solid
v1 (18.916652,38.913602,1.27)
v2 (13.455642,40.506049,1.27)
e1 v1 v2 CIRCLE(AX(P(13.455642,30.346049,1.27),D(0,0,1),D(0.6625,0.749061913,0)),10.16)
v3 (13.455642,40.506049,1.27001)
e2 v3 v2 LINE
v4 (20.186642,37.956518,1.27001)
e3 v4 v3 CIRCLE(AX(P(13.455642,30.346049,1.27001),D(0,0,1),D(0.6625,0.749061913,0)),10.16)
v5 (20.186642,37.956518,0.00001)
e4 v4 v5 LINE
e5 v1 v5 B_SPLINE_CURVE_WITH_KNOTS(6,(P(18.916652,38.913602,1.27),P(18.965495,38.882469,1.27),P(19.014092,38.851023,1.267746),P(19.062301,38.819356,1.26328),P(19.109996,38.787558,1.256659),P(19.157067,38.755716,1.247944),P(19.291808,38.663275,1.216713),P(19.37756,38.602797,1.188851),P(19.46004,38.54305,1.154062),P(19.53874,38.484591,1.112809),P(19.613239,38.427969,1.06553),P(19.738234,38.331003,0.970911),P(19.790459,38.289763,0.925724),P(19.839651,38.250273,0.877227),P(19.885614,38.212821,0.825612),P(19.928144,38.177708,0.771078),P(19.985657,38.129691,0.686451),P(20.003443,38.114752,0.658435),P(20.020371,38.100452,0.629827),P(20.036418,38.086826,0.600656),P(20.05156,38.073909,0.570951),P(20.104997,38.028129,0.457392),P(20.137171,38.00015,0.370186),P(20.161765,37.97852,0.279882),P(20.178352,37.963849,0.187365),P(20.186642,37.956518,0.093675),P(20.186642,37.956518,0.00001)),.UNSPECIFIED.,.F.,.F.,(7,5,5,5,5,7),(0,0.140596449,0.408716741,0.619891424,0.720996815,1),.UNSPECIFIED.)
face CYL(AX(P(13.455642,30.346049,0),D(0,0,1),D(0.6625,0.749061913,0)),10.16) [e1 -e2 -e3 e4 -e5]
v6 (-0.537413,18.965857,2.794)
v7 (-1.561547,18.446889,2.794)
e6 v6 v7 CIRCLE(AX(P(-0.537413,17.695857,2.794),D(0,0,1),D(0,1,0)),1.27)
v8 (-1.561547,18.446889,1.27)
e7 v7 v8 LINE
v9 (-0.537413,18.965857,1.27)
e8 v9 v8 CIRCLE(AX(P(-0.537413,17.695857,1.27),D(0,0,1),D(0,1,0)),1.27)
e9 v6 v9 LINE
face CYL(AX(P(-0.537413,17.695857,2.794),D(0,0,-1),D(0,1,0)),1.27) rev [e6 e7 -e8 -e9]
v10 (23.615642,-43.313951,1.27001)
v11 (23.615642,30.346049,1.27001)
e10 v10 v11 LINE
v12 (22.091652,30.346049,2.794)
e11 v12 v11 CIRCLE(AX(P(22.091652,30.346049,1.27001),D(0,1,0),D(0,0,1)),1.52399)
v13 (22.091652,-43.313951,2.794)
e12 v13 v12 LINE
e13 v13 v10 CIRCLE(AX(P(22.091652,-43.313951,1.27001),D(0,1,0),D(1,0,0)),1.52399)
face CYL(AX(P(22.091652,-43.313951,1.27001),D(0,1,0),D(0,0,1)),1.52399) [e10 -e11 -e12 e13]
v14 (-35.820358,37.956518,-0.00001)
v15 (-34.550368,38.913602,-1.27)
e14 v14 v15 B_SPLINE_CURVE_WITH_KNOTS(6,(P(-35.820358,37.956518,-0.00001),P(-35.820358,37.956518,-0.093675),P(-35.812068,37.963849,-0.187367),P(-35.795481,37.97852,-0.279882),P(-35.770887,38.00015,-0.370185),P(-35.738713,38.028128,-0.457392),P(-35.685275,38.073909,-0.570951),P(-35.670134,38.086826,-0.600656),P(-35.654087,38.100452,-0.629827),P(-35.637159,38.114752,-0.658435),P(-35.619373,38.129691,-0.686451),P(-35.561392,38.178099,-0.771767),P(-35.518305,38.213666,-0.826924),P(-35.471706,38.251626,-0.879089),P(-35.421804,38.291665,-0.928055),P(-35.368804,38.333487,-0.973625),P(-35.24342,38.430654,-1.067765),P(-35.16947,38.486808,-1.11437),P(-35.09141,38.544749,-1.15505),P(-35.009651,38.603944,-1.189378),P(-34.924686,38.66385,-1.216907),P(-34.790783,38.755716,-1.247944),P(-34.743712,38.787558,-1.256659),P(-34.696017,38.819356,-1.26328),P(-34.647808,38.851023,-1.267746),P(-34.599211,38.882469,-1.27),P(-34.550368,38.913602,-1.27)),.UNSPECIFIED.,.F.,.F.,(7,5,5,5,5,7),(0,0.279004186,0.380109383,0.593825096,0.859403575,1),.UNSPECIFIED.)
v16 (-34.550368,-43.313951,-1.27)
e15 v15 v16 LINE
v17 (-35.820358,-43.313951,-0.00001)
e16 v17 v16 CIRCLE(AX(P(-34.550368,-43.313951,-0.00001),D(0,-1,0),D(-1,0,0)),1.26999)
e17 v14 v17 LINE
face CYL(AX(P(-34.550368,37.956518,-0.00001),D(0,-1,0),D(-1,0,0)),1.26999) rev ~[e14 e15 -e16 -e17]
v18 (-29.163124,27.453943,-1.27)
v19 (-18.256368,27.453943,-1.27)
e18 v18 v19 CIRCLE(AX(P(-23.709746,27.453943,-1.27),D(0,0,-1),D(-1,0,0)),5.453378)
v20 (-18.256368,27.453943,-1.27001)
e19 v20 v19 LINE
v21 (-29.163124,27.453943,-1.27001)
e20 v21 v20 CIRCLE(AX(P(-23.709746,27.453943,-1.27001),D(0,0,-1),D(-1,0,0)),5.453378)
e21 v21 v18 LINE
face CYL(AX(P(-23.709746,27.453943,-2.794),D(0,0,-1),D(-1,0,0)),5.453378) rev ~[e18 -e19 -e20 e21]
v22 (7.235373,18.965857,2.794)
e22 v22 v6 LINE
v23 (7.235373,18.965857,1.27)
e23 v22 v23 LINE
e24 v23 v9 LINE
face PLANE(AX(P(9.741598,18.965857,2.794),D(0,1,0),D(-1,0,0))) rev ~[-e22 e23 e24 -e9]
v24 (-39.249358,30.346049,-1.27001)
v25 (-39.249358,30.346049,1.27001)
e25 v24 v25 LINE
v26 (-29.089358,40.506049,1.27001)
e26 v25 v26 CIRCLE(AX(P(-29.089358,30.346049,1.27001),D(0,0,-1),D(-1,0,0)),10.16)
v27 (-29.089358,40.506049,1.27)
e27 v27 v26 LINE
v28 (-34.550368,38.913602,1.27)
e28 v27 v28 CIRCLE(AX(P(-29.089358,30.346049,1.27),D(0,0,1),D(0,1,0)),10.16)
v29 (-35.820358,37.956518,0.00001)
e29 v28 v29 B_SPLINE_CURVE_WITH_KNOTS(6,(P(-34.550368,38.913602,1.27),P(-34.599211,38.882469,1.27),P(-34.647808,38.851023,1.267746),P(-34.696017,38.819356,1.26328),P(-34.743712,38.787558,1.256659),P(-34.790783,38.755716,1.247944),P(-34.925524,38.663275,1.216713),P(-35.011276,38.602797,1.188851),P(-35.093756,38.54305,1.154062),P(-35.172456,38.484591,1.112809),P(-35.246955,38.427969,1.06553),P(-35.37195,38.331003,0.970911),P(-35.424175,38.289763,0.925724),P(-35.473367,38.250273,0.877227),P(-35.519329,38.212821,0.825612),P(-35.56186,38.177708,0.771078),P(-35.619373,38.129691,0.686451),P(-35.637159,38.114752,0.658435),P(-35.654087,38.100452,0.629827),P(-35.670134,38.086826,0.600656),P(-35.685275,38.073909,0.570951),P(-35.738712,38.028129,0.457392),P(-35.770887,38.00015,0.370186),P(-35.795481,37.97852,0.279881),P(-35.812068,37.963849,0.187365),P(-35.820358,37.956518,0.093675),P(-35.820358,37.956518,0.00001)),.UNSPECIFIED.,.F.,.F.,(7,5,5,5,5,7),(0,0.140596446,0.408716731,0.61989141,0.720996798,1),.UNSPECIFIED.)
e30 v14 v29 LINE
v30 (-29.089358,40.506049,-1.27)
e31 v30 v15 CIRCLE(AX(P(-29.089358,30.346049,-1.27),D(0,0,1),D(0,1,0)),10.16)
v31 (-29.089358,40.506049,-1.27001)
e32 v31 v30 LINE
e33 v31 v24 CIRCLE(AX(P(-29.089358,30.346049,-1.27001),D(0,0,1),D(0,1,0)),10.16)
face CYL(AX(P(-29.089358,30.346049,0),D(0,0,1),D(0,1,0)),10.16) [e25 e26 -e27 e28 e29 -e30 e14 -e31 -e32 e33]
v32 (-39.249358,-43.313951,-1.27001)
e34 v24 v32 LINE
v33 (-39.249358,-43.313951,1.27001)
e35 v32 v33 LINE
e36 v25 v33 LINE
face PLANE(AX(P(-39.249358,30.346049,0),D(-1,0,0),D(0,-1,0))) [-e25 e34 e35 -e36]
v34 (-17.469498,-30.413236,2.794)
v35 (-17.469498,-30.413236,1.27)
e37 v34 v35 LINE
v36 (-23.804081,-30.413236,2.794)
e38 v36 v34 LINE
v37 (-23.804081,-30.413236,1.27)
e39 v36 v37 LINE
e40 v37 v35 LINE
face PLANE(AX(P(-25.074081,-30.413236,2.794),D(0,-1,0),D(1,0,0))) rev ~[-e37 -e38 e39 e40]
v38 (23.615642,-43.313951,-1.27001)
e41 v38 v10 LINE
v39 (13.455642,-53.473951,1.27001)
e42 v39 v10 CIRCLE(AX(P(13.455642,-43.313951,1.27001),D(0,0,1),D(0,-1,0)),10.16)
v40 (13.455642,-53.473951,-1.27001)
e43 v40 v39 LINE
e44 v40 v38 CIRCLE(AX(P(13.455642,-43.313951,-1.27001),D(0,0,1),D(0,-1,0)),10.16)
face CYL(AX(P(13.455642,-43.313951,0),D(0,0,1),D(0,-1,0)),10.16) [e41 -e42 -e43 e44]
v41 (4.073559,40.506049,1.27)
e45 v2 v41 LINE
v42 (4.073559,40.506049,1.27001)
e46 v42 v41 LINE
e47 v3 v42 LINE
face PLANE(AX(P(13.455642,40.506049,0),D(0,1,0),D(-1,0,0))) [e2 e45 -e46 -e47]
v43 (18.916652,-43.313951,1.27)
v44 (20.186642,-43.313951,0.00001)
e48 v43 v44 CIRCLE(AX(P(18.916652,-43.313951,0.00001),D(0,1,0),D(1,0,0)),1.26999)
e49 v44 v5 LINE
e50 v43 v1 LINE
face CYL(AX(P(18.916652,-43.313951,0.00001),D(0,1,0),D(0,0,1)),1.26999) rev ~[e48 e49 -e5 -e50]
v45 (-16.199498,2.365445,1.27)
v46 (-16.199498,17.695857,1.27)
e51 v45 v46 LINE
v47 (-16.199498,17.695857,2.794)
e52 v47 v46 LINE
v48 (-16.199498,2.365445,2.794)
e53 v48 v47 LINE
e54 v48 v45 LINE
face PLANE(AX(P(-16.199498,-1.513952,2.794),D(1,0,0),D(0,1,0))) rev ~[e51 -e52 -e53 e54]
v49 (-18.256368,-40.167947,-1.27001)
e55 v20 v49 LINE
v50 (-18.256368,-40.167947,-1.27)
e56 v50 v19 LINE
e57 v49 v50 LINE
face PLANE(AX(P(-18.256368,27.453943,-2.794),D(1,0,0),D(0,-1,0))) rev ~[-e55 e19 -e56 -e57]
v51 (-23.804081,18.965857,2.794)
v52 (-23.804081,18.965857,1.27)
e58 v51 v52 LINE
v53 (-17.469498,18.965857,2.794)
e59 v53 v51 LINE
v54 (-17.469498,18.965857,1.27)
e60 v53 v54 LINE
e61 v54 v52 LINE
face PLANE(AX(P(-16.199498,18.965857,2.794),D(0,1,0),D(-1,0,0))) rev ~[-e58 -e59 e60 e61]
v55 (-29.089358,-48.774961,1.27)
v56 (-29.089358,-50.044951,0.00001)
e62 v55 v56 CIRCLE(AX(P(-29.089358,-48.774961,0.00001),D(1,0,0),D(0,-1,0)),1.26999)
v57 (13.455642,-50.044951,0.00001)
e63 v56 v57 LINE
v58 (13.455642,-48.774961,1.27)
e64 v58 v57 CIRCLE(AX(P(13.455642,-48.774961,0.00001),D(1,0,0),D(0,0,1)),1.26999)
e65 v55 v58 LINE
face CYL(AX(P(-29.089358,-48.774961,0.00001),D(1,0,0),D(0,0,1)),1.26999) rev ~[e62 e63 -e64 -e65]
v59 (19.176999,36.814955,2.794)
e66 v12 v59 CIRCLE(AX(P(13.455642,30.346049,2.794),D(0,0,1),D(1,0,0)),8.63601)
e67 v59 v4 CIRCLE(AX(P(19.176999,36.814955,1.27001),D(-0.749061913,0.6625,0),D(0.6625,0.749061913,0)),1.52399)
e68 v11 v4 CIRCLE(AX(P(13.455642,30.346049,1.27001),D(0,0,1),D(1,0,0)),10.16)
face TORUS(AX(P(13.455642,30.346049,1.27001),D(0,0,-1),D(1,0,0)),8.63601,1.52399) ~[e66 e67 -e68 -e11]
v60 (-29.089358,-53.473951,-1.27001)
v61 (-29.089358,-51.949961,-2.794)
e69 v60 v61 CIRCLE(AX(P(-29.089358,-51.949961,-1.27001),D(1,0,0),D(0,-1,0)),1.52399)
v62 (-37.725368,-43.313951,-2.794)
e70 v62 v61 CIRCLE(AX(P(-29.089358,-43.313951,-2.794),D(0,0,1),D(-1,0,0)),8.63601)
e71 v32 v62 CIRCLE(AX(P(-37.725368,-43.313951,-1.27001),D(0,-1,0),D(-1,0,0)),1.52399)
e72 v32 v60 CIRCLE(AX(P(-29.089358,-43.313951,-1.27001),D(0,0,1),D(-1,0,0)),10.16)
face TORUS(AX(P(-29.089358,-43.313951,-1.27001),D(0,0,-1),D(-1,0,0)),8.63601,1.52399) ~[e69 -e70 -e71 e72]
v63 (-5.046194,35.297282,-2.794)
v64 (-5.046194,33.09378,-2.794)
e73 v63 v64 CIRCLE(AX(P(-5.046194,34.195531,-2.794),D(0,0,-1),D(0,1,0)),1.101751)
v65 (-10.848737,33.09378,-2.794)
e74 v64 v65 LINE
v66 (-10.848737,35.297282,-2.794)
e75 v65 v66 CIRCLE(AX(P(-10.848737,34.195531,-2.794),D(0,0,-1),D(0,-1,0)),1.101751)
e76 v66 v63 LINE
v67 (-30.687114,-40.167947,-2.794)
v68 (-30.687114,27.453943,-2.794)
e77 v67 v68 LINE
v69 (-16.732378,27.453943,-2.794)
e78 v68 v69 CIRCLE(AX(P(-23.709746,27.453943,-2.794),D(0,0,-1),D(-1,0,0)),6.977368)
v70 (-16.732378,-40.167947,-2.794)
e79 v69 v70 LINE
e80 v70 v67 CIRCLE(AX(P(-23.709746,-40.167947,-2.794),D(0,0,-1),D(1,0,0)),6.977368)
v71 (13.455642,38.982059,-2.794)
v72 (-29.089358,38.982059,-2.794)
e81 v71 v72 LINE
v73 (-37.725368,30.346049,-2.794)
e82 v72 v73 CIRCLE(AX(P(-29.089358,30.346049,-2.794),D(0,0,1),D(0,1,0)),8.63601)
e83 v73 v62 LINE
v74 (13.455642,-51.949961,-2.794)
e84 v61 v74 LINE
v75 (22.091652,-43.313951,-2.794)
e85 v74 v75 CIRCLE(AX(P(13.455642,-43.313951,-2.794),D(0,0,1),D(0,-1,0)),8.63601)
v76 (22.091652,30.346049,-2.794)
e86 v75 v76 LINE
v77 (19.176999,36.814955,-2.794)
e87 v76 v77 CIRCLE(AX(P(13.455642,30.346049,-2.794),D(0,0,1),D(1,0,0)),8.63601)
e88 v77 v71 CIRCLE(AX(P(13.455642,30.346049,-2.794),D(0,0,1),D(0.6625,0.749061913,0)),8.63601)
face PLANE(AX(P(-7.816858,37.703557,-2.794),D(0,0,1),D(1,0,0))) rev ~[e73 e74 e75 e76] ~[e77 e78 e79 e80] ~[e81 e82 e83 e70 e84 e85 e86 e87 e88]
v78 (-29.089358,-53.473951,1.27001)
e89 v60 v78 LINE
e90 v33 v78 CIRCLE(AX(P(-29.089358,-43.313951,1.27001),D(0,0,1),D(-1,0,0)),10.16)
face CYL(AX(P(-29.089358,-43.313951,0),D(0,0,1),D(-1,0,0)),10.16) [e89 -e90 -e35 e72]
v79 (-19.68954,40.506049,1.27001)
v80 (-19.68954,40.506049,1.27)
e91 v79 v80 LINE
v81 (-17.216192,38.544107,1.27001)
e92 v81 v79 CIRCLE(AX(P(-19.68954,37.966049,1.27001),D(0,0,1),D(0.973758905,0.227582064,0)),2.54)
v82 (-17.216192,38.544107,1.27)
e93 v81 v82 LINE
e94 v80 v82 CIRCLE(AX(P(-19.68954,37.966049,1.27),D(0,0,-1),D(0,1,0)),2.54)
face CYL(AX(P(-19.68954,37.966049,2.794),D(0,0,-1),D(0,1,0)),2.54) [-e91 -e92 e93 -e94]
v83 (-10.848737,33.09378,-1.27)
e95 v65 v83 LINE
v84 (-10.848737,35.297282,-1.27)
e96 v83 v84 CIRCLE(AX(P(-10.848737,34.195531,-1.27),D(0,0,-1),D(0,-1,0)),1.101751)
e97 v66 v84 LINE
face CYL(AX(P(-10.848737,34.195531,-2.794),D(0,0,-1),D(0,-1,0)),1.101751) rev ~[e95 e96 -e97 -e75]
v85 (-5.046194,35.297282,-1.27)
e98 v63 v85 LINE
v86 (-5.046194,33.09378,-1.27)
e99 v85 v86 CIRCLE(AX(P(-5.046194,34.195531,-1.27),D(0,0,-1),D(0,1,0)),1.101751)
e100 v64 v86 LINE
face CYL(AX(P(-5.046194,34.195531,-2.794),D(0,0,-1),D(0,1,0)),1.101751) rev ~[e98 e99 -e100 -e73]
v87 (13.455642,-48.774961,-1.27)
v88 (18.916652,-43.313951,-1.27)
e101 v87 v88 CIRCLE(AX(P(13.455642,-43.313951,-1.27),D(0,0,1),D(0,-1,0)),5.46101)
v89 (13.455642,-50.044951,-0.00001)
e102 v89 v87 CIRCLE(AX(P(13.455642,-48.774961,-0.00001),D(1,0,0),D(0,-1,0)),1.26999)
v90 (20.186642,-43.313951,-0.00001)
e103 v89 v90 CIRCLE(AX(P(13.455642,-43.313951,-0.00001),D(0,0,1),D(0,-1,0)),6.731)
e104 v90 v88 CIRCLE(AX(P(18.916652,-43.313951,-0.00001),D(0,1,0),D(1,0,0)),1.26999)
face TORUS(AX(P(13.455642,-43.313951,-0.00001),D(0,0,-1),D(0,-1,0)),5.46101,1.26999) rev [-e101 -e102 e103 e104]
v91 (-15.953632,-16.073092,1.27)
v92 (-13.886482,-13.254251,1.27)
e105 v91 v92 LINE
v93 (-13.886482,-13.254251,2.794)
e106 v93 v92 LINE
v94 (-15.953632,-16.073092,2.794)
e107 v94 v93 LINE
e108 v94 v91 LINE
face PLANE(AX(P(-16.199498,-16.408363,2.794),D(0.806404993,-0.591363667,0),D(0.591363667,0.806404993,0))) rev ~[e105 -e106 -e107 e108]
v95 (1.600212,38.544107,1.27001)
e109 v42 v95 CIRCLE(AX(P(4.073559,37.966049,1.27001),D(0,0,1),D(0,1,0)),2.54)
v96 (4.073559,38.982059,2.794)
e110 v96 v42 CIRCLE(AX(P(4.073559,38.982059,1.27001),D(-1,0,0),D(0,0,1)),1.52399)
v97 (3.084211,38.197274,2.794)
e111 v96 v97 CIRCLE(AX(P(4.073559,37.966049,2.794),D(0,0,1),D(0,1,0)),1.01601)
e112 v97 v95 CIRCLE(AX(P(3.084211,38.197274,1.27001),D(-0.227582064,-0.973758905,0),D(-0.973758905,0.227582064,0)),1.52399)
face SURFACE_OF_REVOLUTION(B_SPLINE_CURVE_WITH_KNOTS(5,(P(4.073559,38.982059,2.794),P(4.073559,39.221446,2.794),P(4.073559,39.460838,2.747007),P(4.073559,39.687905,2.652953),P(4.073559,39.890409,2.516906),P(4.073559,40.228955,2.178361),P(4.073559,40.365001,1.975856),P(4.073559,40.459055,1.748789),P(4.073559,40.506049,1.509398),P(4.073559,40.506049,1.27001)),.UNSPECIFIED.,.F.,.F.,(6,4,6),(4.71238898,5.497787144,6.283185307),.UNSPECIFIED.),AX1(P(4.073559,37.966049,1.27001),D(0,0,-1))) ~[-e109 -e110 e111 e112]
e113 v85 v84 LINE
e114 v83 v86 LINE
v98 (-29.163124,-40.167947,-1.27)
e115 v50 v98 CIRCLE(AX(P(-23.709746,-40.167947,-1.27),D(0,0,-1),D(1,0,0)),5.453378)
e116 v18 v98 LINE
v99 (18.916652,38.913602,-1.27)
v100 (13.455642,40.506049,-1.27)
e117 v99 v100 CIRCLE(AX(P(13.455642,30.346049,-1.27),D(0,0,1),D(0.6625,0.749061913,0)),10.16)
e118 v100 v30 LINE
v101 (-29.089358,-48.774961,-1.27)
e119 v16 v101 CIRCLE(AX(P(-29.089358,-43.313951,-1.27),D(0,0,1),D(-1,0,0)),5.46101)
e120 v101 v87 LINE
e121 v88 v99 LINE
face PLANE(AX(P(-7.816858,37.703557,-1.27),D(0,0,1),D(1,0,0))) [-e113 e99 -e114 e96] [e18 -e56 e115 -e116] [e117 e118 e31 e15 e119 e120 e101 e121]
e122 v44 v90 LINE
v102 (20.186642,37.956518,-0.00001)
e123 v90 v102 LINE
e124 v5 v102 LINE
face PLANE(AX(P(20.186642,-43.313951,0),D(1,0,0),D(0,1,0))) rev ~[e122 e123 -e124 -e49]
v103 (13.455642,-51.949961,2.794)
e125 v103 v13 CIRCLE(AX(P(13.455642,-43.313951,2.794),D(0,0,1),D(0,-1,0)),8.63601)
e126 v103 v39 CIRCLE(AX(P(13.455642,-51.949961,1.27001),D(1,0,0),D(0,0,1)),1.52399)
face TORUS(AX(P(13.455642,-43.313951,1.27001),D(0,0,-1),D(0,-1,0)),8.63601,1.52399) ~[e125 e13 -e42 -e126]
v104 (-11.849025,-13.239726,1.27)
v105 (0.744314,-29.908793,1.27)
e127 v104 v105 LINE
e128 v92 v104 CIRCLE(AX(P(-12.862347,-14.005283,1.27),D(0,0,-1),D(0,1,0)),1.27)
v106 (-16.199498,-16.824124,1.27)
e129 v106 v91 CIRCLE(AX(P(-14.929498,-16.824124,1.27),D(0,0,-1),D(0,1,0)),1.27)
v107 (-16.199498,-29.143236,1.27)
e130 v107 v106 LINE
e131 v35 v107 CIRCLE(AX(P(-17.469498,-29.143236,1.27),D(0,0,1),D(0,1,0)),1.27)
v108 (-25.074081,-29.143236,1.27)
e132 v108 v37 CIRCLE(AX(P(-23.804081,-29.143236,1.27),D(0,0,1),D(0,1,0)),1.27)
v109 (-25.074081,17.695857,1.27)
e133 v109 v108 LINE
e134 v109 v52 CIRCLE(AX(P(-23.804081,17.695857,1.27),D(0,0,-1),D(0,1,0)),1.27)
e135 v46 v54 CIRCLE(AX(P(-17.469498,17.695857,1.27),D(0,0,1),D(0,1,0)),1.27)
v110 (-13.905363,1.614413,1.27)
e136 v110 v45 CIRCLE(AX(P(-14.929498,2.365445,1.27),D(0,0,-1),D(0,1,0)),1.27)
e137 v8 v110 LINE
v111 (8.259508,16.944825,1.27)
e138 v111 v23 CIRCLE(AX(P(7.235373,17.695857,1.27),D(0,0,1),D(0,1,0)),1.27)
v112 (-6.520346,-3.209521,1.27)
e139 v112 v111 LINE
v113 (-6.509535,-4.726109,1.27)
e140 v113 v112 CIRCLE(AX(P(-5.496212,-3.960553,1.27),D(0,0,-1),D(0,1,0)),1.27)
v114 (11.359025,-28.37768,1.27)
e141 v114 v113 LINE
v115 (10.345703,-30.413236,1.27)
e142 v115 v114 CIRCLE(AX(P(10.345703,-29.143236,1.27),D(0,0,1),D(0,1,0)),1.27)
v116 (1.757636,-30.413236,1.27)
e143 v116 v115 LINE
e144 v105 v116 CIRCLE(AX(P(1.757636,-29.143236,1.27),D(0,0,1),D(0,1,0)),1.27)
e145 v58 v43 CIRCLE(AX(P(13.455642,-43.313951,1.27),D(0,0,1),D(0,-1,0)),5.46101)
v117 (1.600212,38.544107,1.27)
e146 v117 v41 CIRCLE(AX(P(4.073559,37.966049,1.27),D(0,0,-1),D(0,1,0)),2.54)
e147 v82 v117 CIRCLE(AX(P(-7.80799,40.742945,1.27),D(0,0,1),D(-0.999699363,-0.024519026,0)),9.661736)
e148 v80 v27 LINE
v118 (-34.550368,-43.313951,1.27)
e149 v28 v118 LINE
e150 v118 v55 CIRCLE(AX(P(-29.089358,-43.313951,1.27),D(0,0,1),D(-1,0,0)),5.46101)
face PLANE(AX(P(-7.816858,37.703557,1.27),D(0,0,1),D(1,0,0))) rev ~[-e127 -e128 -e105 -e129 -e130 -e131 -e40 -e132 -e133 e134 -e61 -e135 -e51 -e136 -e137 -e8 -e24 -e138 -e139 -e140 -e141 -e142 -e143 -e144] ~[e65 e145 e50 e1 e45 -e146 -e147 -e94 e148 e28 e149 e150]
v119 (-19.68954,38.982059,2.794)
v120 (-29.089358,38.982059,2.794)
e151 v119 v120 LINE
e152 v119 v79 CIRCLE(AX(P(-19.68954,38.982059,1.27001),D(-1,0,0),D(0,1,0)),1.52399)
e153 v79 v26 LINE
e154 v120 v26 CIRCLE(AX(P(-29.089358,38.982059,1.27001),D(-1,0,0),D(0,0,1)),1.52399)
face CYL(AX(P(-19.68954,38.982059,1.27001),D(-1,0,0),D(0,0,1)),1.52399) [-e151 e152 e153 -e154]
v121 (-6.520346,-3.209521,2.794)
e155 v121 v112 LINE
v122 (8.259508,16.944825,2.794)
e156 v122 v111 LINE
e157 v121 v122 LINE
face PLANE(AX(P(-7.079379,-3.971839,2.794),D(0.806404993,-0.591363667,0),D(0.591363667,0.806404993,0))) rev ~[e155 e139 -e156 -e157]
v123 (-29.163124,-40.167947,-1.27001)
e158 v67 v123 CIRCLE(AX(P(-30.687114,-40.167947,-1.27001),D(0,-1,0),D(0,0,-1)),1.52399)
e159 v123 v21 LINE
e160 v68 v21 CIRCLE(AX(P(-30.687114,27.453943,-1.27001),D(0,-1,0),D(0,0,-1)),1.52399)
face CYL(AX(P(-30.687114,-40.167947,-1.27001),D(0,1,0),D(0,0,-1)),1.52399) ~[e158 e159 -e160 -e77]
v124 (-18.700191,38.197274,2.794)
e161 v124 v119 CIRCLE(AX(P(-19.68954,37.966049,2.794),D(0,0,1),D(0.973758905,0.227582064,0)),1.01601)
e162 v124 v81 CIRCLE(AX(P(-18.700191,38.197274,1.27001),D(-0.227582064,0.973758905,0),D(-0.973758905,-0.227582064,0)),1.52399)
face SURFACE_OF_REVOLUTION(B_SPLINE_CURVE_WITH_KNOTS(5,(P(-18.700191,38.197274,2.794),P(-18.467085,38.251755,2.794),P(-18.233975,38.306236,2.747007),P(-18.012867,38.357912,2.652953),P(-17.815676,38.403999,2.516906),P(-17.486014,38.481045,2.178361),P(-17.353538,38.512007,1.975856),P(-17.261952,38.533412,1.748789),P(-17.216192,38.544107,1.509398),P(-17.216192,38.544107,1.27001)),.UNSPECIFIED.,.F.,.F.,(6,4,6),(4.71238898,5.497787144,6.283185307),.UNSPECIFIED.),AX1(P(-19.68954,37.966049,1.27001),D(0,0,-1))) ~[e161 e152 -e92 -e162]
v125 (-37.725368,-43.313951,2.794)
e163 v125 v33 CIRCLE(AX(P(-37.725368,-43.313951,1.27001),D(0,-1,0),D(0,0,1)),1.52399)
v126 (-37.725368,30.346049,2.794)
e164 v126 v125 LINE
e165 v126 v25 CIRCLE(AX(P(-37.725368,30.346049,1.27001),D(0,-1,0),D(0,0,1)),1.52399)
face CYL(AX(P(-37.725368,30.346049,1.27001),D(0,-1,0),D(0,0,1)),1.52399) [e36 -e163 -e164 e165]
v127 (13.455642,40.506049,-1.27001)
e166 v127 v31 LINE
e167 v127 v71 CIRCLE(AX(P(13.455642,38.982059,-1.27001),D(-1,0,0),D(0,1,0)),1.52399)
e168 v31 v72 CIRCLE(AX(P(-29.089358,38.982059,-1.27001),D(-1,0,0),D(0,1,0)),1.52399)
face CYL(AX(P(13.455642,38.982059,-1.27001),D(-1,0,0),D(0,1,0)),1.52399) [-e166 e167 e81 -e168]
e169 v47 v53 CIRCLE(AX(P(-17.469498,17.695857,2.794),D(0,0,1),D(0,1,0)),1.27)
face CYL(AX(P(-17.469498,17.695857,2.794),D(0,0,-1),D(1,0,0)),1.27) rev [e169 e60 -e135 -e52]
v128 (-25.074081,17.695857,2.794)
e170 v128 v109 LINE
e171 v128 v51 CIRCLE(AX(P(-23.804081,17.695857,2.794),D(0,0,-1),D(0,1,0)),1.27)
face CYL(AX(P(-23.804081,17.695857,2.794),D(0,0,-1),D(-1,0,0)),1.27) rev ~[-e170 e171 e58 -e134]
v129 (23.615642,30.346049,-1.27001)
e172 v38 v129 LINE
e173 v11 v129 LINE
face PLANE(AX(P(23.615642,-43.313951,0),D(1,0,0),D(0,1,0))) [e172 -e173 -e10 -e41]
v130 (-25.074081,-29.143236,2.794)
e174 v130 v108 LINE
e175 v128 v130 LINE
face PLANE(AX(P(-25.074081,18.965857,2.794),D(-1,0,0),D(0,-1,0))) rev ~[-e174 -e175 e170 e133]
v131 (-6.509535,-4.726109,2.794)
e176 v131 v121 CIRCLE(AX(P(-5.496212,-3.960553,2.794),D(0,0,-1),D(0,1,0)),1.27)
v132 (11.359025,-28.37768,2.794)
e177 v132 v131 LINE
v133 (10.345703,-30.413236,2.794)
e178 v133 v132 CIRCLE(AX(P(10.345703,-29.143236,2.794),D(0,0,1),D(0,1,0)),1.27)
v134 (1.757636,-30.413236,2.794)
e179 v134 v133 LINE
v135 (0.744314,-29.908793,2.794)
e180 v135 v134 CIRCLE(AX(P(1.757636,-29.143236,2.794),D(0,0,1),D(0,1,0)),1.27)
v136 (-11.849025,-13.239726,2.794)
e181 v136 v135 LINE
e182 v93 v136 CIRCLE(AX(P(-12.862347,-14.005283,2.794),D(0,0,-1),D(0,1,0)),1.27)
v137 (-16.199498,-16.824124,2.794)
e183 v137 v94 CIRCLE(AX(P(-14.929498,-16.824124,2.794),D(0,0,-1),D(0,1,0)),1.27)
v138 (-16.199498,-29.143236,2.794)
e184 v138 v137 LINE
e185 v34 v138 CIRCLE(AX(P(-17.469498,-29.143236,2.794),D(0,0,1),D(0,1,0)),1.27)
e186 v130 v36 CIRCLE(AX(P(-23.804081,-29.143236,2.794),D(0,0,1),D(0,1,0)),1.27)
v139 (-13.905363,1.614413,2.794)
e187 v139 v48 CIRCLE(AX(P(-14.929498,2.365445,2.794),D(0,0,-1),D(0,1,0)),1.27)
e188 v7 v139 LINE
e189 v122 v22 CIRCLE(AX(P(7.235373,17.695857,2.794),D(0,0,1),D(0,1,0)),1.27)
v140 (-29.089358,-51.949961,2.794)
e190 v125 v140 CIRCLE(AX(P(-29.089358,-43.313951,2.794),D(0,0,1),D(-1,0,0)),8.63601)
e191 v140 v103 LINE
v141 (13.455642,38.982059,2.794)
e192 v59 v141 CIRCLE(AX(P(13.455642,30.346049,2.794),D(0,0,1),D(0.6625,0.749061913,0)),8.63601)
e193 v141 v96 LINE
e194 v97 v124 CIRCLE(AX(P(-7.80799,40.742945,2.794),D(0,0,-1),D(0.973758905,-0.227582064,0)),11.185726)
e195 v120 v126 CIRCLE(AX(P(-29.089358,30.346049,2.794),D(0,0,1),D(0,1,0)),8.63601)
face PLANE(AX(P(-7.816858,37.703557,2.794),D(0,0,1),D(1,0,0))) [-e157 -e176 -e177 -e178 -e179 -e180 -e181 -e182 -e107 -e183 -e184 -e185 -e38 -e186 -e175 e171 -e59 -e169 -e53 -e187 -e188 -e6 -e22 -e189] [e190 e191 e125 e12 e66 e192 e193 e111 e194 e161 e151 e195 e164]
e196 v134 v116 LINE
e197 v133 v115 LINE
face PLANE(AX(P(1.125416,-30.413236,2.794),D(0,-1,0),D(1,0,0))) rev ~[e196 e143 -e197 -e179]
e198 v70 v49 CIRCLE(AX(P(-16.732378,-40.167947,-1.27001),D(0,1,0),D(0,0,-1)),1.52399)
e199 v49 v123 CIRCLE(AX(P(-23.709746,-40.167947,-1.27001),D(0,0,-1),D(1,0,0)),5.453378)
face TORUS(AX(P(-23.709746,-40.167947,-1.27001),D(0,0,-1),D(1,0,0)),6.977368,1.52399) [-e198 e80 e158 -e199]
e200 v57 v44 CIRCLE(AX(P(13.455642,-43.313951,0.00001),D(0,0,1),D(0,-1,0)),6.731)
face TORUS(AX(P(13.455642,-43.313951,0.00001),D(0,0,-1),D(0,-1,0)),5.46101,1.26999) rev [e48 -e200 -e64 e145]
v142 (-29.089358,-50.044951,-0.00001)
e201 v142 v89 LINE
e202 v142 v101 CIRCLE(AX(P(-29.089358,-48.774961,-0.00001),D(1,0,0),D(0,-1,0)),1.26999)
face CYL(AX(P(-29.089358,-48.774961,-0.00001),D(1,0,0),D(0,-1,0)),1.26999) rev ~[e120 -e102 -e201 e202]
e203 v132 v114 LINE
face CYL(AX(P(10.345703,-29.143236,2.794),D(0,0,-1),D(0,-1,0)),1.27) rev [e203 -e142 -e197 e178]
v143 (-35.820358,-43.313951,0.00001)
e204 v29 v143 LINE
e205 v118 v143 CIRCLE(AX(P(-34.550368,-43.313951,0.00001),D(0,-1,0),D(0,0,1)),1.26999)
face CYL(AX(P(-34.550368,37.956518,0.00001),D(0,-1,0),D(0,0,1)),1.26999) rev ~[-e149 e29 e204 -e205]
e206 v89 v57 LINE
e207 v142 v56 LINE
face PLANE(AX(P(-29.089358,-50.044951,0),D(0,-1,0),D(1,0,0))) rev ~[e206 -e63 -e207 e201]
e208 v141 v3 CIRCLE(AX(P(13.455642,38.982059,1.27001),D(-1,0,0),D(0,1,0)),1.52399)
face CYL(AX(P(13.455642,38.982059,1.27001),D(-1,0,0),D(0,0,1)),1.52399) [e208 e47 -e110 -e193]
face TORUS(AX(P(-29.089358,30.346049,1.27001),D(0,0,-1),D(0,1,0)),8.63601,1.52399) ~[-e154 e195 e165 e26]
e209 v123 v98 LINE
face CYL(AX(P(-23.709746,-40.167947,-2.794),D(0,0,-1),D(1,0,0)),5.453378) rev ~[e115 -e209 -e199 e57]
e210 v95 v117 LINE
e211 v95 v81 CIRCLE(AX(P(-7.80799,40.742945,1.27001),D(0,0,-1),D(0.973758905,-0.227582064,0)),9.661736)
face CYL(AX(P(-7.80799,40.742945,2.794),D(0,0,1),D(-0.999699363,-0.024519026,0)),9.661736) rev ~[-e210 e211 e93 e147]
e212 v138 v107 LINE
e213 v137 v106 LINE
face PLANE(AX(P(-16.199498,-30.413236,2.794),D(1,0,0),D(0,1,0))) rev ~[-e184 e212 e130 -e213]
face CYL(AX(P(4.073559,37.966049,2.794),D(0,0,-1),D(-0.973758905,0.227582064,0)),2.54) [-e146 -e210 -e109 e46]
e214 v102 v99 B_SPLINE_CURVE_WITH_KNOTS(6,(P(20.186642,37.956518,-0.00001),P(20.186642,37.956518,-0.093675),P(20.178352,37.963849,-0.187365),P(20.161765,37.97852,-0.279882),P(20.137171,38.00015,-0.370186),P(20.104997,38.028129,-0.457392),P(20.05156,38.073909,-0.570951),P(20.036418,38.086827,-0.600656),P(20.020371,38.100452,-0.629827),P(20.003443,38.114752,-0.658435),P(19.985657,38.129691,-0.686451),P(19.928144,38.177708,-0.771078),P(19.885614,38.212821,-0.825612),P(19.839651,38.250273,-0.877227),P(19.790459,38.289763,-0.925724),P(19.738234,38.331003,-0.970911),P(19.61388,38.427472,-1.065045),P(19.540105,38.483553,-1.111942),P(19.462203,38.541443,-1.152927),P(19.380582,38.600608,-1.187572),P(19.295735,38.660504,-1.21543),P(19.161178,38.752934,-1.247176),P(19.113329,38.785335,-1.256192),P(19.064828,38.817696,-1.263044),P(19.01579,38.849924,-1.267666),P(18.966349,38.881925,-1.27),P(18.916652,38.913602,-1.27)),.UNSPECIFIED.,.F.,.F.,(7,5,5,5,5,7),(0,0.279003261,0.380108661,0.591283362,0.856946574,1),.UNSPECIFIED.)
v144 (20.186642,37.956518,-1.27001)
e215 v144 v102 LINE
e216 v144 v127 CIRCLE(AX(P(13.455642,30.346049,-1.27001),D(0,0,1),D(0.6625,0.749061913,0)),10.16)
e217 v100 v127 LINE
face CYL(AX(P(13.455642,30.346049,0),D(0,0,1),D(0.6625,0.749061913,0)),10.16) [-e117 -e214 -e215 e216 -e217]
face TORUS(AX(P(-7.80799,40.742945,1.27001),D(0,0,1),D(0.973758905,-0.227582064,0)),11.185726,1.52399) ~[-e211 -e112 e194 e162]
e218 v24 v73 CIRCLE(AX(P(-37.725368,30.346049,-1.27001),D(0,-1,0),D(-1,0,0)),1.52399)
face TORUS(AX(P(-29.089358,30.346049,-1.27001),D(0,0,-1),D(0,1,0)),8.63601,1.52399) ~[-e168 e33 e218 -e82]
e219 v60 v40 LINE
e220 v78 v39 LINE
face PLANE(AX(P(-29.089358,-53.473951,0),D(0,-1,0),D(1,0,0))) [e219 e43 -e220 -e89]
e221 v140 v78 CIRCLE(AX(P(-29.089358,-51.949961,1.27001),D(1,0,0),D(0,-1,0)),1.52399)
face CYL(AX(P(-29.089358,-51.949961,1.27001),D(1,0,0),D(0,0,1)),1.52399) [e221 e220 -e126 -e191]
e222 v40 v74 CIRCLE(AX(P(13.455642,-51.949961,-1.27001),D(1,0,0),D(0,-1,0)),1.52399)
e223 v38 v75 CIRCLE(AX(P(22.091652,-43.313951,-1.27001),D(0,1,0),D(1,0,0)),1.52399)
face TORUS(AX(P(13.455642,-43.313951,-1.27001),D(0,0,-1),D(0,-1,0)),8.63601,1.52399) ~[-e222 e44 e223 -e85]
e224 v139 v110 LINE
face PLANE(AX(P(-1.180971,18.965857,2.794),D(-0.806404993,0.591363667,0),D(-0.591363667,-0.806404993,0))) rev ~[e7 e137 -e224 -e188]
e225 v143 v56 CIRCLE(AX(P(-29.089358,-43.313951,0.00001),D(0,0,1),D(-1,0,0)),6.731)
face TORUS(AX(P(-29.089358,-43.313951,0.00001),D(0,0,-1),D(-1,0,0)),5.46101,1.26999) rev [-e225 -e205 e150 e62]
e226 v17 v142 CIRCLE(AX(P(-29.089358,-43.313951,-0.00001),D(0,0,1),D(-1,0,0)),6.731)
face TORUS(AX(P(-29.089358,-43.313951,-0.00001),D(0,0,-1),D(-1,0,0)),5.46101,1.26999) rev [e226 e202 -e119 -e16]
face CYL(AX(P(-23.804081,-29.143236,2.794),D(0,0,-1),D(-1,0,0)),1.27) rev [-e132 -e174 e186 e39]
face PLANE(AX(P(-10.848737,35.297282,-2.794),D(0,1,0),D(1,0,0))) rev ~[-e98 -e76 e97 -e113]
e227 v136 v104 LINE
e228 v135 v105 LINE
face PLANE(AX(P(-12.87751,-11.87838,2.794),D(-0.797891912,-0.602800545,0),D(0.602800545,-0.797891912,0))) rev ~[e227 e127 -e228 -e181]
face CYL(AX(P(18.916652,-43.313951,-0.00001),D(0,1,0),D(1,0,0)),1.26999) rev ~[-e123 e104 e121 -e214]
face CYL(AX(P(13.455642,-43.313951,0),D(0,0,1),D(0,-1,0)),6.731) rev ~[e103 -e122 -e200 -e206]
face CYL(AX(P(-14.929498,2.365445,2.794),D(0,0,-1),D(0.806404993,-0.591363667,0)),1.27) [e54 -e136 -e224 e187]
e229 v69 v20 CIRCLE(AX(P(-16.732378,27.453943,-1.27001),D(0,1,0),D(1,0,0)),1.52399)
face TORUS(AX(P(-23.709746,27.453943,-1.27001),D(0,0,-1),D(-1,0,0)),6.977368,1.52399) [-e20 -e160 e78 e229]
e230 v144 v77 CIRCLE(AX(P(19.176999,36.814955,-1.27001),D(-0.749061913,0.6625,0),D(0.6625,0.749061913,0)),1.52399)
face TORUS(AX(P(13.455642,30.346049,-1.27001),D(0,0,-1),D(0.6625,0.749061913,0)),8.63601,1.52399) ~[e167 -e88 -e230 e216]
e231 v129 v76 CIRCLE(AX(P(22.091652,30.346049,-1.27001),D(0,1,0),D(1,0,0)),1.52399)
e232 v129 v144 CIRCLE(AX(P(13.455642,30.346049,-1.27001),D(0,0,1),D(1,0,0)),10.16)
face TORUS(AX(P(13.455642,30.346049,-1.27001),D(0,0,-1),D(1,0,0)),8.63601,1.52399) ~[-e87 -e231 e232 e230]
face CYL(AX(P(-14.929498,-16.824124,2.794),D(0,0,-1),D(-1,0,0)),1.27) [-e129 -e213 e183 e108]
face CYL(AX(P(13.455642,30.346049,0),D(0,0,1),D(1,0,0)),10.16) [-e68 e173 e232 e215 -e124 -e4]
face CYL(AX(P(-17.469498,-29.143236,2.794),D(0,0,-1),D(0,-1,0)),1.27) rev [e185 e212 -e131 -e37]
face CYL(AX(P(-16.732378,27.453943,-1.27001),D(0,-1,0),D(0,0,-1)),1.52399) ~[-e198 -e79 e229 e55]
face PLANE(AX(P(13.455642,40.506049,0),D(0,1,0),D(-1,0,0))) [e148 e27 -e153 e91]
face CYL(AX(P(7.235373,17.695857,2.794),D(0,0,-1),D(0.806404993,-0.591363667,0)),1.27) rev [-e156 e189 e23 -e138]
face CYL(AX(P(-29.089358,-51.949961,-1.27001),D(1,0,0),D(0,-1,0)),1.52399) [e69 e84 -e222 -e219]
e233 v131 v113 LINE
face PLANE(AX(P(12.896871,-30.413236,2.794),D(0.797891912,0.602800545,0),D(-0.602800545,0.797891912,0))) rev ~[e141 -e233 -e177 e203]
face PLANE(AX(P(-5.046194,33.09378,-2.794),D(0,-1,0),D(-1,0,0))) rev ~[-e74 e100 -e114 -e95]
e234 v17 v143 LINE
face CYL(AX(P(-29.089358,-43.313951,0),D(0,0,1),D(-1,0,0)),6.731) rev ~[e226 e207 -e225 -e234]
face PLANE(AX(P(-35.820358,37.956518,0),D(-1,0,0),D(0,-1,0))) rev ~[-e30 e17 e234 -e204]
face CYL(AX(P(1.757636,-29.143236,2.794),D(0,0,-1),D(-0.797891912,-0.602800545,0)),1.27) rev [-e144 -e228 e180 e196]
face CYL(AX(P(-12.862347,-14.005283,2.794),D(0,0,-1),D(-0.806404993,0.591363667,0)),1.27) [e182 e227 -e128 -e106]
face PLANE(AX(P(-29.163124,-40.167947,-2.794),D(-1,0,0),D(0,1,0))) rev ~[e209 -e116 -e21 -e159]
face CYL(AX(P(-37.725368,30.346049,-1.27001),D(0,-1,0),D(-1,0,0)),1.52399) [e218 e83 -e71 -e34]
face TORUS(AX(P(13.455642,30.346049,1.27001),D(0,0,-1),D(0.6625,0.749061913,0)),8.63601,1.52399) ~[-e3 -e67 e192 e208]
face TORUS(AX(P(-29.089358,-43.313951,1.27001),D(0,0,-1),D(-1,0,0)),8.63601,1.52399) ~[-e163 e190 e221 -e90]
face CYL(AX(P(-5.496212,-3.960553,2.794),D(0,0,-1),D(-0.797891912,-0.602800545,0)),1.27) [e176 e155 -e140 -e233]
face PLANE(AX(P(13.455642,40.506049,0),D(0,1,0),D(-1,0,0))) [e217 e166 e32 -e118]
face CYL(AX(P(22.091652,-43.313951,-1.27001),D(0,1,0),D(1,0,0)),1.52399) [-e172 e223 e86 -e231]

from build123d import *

# Parameters (mm, degrees)
F1_DEPTH = 2.794
F2_DEPTH = 1.27
F4_DEPTH = 2.54
F6_DEPTH = 2.54
F8_DEPTH = 2.54
F9_R     = 2.54
F10_R    = 1.52399
F11_R    = 1.27
F12_R    = 1.26999


# Not quite as in the source:
# - a fillet or chamfer is up to 0.001 mm smaller than in the source, because OpenCascade refuses the exact size


with BuildPart() as f1:
    # F0 (on Top) → F1 (new body, symmetric)
    with BuildSketch(Plane.XY):
        with BuildLine():
            Line((13.4556421247, 40.506048555), (-29.0893578753, 40.506048555))
            ThreePointArc((-29.0893578753, 40.506048555), (-32.6881934203, 39.8473107196), (-35.8203578753, 37.9565175945))
            Line((-35.8203578753, 37.9565175945), (-35.8203578753, 30.346048555))
            ThreePointArc((-35.8203578753, 30.346048555), (-33.8488936195, 35.1055842992), (-29.0893578753, 37.077048555))
            Line((-29.0893578753, 37.077048555), (13.4556421247, 37.077048555))
            ThreePointArc((13.4556421247, 37.077048555), (18.2151778689, 35.1055842992), (20.1866421247, 30.346048555))
            Line((20.1866421247, 30.346048555), (20.1866421247, 37.9565175945))
            ThreePointArc((20.1866421247, 37.9565175945), (17.0544776697, 39.8473107196), (13.4556421247, 40.506048555))
        make_face()
        with BuildLine():
            ThreePointArc((-29.0893578753, 37.077048555), (-33.8488936195, 35.1055842992), (-35.8203578753, 30.346048555))
            Line((-35.8203578753, 30.346048555), (-35.8203578753, -43.313951445))
            ThreePointArc((-35.8203578753, -43.313951445), (-33.8488936195, -48.0734871891), (-29.0893578753, -50.044951445))
            Line((-29.0893578753, -50.044951445), (13.4556421247, -50.044951445))
            ThreePointArc((13.4556421247, -50.044951445), (18.2151778689, -48.0734871891), (20.1866421247, -43.313951445))
            Line((20.1866421247, -43.313951445), (20.1866421247, 30.346048555))
            ThreePointArc((20.1866421247, 30.346048555), (18.2151778689, 35.1055842992), (13.4556421247, 37.077048555))
            Line((13.4556421247, 37.077048555), (-29.0893578753, 37.077048555))
        make_face()
        with BuildLine():
            Line((-35.8203578753, 30.346048555), (-35.8203578753, 37.9565175945))
            ThreePointArc((-35.8203578753, 37.9565175945), (-38.3525257999, 34.5196944432), (-39.2493578753, 30.346048555))
            Line((-39.2493578753, 30.346048555), (-39.2493578753, -43.313951445))
            ThreePointArc((-39.2493578753, -43.313951445), (-36.2735627721, -50.4981563418), (-29.0893578753, -53.473951445))
            Line((-29.0893578753, -53.473951445), (13.4556421247, -53.473951445))
            ThreePointArc((13.4556421247, -53.473951445), (20.6398470216, -50.4981563418), (23.6156421247, -43.313951445))
            Line((23.6156421247, -43.313951445), (23.6156421247, 30.346048555))
            ThreePointArc((23.6156421247, 30.346048555), (22.7188100493, 34.5196944432), (20.1866421247, 37.9565175945))
            Line((20.1866421247, 37.9565175945), (20.1866421247, 30.346048555))
            Line((20.1866421247, 30.346048555), (20.1866421247, -43.313951445))
            ThreePointArc((20.1866421247, -43.313951445), (18.2151778689, -48.0734871891), (13.4556421247, -50.044951445))
            Line((13.4556421247, -50.044951445), (-29.0893578753, -50.044951445))
            ThreePointArc((-29.0893578753, -50.044951445), (-33.8488936195, -48.0734871891), (-35.8203578753, -43.313951445))
            Line((-35.8203578753, -43.313951445), (-35.8203578753, 30.346048555))
        make_face()
    extrude(amount=F1_DEPTH, both=True)

    # F0 (on Top) → F2 (cut, symmetric)
    with BuildSketch(Plane.XY):
        with BuildLine():
            Line((13.4556421247, 40.506048555), (-29.0893578753, 40.506048555))
            ThreePointArc((-29.0893578753, 40.506048555), (-32.6881934203, 39.8473107196), (-35.8203578753, 37.9565175945))
            Line((-35.8203578753, 37.9565175945), (-35.8203578753, 30.346048555))
            ThreePointArc((-35.8203578753, 30.346048555), (-33.8488936195, 35.1055842992), (-29.0893578753, 37.077048555))
            Line((-29.0893578753, 37.077048555), (13.4556421247, 37.077048555))
            ThreePointArc((13.4556421247, 37.077048555), (18.2151778689, 35.1055842992), (20.1866421247, 30.346048555))
            Line((20.1866421247, 30.346048555), (20.1866421247, 37.9565175945))
            ThreePointArc((20.1866421247, 37.9565175945), (17.0544776697, 39.8473107196), (13.4556421247, 40.506048555))
        make_face()
        with BuildLine():
            ThreePointArc((-29.0893578753, 37.077048555), (-33.8488936195, 35.1055842992), (-35.8203578753, 30.346048555))
            Line((-35.8203578753, 30.346048555), (-35.8203578753, -43.313951445))
            ThreePointArc((-35.8203578753, -43.313951445), (-33.8488936195, -48.0734871891), (-29.0893578753, -50.044951445))
            Line((-29.0893578753, -50.044951445), (13.4556421247, -50.044951445))
            ThreePointArc((13.4556421247, -50.044951445), (18.2151778689, -48.0734871891), (20.1866421247, -43.313951445))
            Line((20.1866421247, -43.313951445), (20.1866421247, 30.346048555))
            ThreePointArc((20.1866421247, 30.346048555), (18.2151778689, 35.1055842992), (13.4556421247, 37.077048555))
            Line((13.4556421247, 37.077048555), (-29.0893578753, 37.077048555))
        make_face()
    extrude(amount=F2_DEPTH, both=True, mode=Mode.SUBTRACT)

    # F3 (on face) → F4 (cut)
    with BuildSketch(Plane.XY.offset(2.794)):
        Polygon((-16.199497506, 18.9658571035), (-25.0740814954, 18.9658571035), (-25.0740814954, -30.413236469), (-16.199497506, -30.413236469), (-16.199497506, -16.4083634515), (-12.8775097826, -11.8783802343), (1.1254162528, -30.413236469), (12.8968711942, -30.413236469), (-7.0793794499, -3.9718389452), (9.7415978089, 18.9658571035), (-1.1809705757, 18.9658571035), (-16.199497506, -1.5139521565), align=None)
    extrude(amount=-F4_DEPTH, mode=Mode.SUBTRACT)

    # F5 (on face) → F6 (cut)
    with BuildSketch(Plane(origin=(0, 0, -2.794), x_dir=(1, 0, 0), z_dir=(0, 0, -1))):
        with BuildLine():
            Line((-29.1631240398, 40.1679472998), (-29.1631240398, -27.4539431557))
            ThreePointArc((-29.1631240398, -27.4539431557), (-23.7097460777, -32.9073211178), (-18.2563681155, -27.4539431557))
            Line((-18.2563681155, -27.4539431557), (-18.2563681155, 40.1679472998))
            ThreePointArc((-18.2563681155, 40.1679472998), (-23.7097460777, 45.6213252619), (-29.1631240398, 40.1679472998))
        make_face()
        with BuildLine():
            ThreePointArc((-5.0461939536, -35.2972820401), (-3.9444430731, -34.1955311596), (-5.0461939536, -33.0937802792))
            Line((-5.0461939536, -33.0937802792), (-10.8487373218, -33.0937802792))
            ThreePointArc((-10.8487373218, -33.0937802792), (-11.9504882023, -34.1955311596), (-10.8487373218, -35.2972820401))
            Line((-10.8487373218, -35.2972820401), (-5.0461939536, -35.2972820401))
        make_face()
    extrude(amount=-F6_DEPTH, mode=Mode.SUBTRACT)

    # F7 (on face) → F8 (cut)
    with BuildSketch(Plane.XY.offset(2.794)):
        with BuildLine():
            Line((1.8508417322, 40.506048555), (-17.466821873, 40.506048555))
            ThreePointArc((-17.466821873, 40.506048555), (-7.8079900704, 31.0812084526), (1.8508417322, 40.506048555))
        make_face()
    extrude(amount=-F8_DEPTH, mode=Mode.SUBTRACT)

    # F9
    f9_edges = [f1.edges().sort_by_distance(p)[0] for p in [
        (1.850842, 40.506049, 2.032),
        (-17.466822, 40.506049, 2.032),
    ]]
    fillet(f9_edges, radius=F9_R)

    # F10 (radius 1.524 in the source; OpenCascade refuses exactly that, so slightly less here)
    f10_edges = [f1.edges().sort_by_distance(p)[0] for p in [
        (-39.249358, -6.483951, 2.794),
        (-39.249358, -6.483951, -2.794),
        (-29.163124, -6.357002, -2.794),
    ]]
    fillet(f10_edges, radius=F10_R)

    # F11
    f11_edges = [f1.edges().sort_by_distance(p)[0] for p in [
        (9.741598, 18.965857, 2.032),
        (-1.180971, 18.965857, 2.032),
        (-16.199498, 18.965857, 2.032),
        (-16.199498, -1.513952, 2.032),
        (-7.079379, -3.971839, 2.032),
        (12.896871, -30.413236, 2.032),
        (1.125416, -30.413236, 2.032),
        (-12.87751, -11.87838, 2.032),
        (-16.199498, -16.408363, 2.032),
        (-16.199498, -30.413236, 2.032),
        (-25.074081, -30.413236, 2.032),
        (-25.074081, 18.965857, 2.032),
    ]]
    fillet(f11_edges, radius=F11_R)

    # F12 (radius 1.27 in the source; OpenCascade refuses exactly that, so slightly less here)
    f12_edges = [f1.edges().sort_by_distance(p)[0] for p in [
        (-35.820358, -2.678717, 1.27),
        (-35.820358, -2.678717, -1.27),
    ]]
    fillet(f12_edges, radius=F12_R)


solid = f1.part
